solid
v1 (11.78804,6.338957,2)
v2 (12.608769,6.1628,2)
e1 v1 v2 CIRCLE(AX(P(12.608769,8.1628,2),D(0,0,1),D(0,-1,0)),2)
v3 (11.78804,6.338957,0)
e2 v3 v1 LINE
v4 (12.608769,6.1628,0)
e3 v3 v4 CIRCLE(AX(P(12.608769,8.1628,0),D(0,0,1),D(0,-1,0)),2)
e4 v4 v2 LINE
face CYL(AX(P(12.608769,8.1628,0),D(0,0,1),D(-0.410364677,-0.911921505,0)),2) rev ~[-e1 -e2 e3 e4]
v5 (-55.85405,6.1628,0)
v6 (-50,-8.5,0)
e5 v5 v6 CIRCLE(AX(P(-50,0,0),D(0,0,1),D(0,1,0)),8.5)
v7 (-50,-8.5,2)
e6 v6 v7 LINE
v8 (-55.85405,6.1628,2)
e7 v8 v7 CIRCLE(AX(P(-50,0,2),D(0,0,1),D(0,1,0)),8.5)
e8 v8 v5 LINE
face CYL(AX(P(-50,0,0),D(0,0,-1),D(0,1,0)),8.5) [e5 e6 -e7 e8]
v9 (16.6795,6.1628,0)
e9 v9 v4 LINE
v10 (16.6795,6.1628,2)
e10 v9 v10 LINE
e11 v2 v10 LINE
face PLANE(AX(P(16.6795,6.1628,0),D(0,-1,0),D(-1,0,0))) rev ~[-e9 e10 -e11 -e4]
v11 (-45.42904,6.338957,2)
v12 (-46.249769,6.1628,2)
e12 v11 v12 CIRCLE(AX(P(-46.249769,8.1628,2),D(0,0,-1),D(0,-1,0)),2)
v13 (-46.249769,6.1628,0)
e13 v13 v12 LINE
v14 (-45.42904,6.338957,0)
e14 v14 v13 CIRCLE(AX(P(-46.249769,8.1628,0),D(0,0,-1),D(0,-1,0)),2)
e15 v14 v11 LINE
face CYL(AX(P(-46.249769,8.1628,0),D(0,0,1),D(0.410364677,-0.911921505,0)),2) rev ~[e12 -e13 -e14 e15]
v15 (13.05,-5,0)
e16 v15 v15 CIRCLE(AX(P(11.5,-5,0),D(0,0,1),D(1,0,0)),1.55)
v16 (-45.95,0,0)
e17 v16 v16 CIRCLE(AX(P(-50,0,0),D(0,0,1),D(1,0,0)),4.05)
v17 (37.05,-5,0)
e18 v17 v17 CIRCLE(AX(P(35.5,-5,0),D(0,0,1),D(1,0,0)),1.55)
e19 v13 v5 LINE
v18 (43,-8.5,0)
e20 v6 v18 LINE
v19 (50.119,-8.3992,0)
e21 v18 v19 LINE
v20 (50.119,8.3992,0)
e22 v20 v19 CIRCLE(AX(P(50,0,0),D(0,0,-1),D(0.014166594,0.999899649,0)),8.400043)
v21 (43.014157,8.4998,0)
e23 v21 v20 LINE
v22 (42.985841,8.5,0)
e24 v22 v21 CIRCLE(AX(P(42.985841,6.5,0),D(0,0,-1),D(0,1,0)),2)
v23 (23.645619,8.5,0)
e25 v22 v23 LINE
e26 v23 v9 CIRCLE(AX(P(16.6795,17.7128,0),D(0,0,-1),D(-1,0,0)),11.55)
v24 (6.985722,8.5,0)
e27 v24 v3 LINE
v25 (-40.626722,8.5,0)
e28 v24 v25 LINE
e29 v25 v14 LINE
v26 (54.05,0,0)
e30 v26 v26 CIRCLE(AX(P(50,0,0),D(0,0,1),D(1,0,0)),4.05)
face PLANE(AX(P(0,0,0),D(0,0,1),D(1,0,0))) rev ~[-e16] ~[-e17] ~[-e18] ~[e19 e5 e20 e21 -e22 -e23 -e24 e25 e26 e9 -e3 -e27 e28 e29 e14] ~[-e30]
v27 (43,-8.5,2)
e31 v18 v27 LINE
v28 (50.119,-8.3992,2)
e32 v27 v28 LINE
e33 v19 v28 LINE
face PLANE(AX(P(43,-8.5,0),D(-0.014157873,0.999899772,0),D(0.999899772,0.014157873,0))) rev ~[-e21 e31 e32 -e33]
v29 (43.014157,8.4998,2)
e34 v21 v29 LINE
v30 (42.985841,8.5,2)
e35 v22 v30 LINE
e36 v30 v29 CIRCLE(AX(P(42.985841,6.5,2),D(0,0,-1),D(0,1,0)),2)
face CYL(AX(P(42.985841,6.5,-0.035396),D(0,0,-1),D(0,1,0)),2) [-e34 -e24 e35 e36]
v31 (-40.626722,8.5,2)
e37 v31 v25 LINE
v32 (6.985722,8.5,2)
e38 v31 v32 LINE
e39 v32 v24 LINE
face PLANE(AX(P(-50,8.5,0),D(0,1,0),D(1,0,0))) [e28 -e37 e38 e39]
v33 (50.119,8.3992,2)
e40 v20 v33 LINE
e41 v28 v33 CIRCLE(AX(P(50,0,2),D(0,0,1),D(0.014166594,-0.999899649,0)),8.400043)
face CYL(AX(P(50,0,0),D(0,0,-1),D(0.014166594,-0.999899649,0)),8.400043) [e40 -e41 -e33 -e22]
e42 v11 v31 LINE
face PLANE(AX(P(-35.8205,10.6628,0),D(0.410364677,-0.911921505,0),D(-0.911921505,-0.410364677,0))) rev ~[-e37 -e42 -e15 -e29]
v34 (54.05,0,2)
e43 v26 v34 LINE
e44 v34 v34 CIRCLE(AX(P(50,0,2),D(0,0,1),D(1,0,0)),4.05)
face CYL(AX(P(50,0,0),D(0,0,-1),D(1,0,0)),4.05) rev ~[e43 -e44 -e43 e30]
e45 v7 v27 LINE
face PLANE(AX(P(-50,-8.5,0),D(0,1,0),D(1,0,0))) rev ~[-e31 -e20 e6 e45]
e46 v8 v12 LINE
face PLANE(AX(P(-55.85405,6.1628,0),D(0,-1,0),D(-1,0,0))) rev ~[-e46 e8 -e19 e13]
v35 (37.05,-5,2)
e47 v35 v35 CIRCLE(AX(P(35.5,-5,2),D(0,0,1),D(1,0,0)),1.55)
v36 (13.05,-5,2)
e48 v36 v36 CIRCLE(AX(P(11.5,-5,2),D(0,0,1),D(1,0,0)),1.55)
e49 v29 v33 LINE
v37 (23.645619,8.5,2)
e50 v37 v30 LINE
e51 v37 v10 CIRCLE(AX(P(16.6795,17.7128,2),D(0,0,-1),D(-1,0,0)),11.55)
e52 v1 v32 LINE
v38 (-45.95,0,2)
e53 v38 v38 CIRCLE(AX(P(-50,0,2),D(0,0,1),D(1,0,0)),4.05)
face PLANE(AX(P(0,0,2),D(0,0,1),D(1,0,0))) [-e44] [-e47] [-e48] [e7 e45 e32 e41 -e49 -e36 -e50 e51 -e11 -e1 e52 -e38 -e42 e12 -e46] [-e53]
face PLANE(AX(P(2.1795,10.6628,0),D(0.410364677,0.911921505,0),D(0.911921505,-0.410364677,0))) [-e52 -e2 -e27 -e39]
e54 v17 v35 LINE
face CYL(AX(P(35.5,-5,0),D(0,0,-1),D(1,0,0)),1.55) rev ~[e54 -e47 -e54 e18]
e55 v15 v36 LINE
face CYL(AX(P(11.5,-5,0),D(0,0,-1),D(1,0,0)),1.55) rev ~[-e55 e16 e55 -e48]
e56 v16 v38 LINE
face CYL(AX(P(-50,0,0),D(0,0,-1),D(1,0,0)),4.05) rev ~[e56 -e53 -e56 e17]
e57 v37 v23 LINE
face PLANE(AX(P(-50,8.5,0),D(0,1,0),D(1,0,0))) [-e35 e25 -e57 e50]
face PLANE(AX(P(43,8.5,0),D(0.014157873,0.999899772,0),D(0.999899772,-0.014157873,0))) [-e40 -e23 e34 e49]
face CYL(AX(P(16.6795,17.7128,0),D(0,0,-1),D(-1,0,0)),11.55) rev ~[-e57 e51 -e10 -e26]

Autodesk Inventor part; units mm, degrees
ref_plane "YZ Plane" through (0, 0, 0) normal (1, 0, 0) x (0, 1, 0)
ref_plane "XZ Plane" through (0, 0, 0) normal (0, 1, 0) x (-1, 0, 0)
ref_plane "XY Plane" through (0, 0, 0) normal (0, 0, 1) x (1, 0, 0)
sketch "スケッチ1" plane through (0, 0, 0) normal (0, 0, 1) x (1, 0, 0)
  line L0 (-50, 0) -> (50, 0) construction
  circle A0 centre (-50, 0) radius 4.05
  circle A1 centre (50, 0) radius 4.05
  line L1 (-50, 8.5) -> (43, 8.5)
  line L2 (-50, -8.5) -> (43, -8.5)
  arc A2 (-50, 8.5) -> (-50, -8.5) centre (-50, 0) ccw
  line L3 (43, -8.5) -> (50.119, -8.3992)
  line L4 (43, 8.5) -> (50.119, 8.3992)
  arc A3 (50.119, -8.3992) -> (50.119, 8.3992) centre (50, 0) ccw
  line L5 (9, -7.5) -> (38, -7.5) construction
  line L6 (38, -7.5) -> (38, -2.5) construction
  line L7 (38, -2.5) -> (9, -2.5) construction
  line L8 (9, -2.5) -> (9, -7.5) construction
  line L9 (9, -5) -> (38, -5) construction
  circle A4 centre (11.5, -5) radius 1.55
  line L10 (23.5, -5) -> (23.5, -2.5) construction
  line L11 (52.3191, 13) -> (22.3191, 13)
  line L12 (22.3191, 13) -> (12.3191, 8.5)
  line L13 (52.3191, 13) -> (57.3191, 4.122)
  circle A5 centre (35.5, -5) radius 1.55
  point P0 (0, 0)
  point P1 (0, 0)
  point P2 (54.8534, 8.5)
  dimension "d0" = 100
  dimension "d1" = 8.1
  dimension "d2" = 8.5
  dimension "d8" = 8.1
  dimension "d9" = 7
  dimension "d10" = 8.4
  dimension "d12" = 5
  dimension "d13" = 29
  dimension "d15" = 2.5
  dimension "d17" = 13
  dimension "d19" = 10
  dimension "d20" = 30
  dimension "d25" = 12
  dimension "d26" = 5
  dimension "d45" = 1
  dimension "d46" = 3.1
extrude "押し出し1" add sketch "スケッチ1" along normal blind 2 contours L1 L4 A3 L3 L2 A2
fillet "フィレット1" radius 2 1 edges at (43, 8.5, 1)
sketch "スケッチ2" plane through (0, 0, 0) normal (0, 0, -1) x (-1, 0, 0)
  circle A0 centre (-16.6795, 17.7128) radius 11.35 construction
  circle A1 centre (-16.6795, 17.7128) radius 11.55
  line L0 (-16.6795, 6.1628) -> (58.7547, 6.1628)
  line L1 (-16.6795, 17.7128) -> (-34, 27.7128) construction
  circle A2 centre (-50, 0) radius 4.05 projected
  line L2 (-50, 0) -> (-34, 27.7128) construction
  line L3 (50, -8.5) -> (-43, -8.5) projected
  line L4 (-2.1795, 10.6628) -> (35.8205, 10.6628)
  line L5 (35.8205, 10.6628) -> (45.8205, 6.1628)
  line L6 (-2.1795, 10.6628) -> (-12.1795, 6.1628)
  circle A3 centre (50, 0) radius 4.05 projected
  line L7 (58.7547, 6.1628) -> (-13.2236, 28.7337)
  arc A4 (50, -8.5) -> (50, 8.5) centre (50, 0) ccw projected
  point P0 (0, 0)
  dimension "d29" = 22.7
  dimension "d30" = 0.2
  dimension "d31" = 60
  dimension "d32" = 90
  dimension "d33" = 20
  dimension "d34" = 38
  dimension "d35" = 10
  dimension "d36" = 10
  dimension "d37" = 4.5
  dimension "d38" = 32
  dimension "d40" = 4.5
extrude "押し出し2" cut sketch "スケッチ2" against normal through all contours A1 | A1 L7 A4 L0 L5 L4 L6 | L7 L0 A4
fillet "フィレット2" radius 2 2 edges at (12.1795, 6.1628, 1) (-45.8205, 6.1628, 1)
equation "\"d8\" = d1"
equation "\"d19\" = d18"
equation "\"d36\" = d35"
equation "\"d18\" = 10"
properties part number "リンク_メインフレーム_6_1" material "GFRP"
